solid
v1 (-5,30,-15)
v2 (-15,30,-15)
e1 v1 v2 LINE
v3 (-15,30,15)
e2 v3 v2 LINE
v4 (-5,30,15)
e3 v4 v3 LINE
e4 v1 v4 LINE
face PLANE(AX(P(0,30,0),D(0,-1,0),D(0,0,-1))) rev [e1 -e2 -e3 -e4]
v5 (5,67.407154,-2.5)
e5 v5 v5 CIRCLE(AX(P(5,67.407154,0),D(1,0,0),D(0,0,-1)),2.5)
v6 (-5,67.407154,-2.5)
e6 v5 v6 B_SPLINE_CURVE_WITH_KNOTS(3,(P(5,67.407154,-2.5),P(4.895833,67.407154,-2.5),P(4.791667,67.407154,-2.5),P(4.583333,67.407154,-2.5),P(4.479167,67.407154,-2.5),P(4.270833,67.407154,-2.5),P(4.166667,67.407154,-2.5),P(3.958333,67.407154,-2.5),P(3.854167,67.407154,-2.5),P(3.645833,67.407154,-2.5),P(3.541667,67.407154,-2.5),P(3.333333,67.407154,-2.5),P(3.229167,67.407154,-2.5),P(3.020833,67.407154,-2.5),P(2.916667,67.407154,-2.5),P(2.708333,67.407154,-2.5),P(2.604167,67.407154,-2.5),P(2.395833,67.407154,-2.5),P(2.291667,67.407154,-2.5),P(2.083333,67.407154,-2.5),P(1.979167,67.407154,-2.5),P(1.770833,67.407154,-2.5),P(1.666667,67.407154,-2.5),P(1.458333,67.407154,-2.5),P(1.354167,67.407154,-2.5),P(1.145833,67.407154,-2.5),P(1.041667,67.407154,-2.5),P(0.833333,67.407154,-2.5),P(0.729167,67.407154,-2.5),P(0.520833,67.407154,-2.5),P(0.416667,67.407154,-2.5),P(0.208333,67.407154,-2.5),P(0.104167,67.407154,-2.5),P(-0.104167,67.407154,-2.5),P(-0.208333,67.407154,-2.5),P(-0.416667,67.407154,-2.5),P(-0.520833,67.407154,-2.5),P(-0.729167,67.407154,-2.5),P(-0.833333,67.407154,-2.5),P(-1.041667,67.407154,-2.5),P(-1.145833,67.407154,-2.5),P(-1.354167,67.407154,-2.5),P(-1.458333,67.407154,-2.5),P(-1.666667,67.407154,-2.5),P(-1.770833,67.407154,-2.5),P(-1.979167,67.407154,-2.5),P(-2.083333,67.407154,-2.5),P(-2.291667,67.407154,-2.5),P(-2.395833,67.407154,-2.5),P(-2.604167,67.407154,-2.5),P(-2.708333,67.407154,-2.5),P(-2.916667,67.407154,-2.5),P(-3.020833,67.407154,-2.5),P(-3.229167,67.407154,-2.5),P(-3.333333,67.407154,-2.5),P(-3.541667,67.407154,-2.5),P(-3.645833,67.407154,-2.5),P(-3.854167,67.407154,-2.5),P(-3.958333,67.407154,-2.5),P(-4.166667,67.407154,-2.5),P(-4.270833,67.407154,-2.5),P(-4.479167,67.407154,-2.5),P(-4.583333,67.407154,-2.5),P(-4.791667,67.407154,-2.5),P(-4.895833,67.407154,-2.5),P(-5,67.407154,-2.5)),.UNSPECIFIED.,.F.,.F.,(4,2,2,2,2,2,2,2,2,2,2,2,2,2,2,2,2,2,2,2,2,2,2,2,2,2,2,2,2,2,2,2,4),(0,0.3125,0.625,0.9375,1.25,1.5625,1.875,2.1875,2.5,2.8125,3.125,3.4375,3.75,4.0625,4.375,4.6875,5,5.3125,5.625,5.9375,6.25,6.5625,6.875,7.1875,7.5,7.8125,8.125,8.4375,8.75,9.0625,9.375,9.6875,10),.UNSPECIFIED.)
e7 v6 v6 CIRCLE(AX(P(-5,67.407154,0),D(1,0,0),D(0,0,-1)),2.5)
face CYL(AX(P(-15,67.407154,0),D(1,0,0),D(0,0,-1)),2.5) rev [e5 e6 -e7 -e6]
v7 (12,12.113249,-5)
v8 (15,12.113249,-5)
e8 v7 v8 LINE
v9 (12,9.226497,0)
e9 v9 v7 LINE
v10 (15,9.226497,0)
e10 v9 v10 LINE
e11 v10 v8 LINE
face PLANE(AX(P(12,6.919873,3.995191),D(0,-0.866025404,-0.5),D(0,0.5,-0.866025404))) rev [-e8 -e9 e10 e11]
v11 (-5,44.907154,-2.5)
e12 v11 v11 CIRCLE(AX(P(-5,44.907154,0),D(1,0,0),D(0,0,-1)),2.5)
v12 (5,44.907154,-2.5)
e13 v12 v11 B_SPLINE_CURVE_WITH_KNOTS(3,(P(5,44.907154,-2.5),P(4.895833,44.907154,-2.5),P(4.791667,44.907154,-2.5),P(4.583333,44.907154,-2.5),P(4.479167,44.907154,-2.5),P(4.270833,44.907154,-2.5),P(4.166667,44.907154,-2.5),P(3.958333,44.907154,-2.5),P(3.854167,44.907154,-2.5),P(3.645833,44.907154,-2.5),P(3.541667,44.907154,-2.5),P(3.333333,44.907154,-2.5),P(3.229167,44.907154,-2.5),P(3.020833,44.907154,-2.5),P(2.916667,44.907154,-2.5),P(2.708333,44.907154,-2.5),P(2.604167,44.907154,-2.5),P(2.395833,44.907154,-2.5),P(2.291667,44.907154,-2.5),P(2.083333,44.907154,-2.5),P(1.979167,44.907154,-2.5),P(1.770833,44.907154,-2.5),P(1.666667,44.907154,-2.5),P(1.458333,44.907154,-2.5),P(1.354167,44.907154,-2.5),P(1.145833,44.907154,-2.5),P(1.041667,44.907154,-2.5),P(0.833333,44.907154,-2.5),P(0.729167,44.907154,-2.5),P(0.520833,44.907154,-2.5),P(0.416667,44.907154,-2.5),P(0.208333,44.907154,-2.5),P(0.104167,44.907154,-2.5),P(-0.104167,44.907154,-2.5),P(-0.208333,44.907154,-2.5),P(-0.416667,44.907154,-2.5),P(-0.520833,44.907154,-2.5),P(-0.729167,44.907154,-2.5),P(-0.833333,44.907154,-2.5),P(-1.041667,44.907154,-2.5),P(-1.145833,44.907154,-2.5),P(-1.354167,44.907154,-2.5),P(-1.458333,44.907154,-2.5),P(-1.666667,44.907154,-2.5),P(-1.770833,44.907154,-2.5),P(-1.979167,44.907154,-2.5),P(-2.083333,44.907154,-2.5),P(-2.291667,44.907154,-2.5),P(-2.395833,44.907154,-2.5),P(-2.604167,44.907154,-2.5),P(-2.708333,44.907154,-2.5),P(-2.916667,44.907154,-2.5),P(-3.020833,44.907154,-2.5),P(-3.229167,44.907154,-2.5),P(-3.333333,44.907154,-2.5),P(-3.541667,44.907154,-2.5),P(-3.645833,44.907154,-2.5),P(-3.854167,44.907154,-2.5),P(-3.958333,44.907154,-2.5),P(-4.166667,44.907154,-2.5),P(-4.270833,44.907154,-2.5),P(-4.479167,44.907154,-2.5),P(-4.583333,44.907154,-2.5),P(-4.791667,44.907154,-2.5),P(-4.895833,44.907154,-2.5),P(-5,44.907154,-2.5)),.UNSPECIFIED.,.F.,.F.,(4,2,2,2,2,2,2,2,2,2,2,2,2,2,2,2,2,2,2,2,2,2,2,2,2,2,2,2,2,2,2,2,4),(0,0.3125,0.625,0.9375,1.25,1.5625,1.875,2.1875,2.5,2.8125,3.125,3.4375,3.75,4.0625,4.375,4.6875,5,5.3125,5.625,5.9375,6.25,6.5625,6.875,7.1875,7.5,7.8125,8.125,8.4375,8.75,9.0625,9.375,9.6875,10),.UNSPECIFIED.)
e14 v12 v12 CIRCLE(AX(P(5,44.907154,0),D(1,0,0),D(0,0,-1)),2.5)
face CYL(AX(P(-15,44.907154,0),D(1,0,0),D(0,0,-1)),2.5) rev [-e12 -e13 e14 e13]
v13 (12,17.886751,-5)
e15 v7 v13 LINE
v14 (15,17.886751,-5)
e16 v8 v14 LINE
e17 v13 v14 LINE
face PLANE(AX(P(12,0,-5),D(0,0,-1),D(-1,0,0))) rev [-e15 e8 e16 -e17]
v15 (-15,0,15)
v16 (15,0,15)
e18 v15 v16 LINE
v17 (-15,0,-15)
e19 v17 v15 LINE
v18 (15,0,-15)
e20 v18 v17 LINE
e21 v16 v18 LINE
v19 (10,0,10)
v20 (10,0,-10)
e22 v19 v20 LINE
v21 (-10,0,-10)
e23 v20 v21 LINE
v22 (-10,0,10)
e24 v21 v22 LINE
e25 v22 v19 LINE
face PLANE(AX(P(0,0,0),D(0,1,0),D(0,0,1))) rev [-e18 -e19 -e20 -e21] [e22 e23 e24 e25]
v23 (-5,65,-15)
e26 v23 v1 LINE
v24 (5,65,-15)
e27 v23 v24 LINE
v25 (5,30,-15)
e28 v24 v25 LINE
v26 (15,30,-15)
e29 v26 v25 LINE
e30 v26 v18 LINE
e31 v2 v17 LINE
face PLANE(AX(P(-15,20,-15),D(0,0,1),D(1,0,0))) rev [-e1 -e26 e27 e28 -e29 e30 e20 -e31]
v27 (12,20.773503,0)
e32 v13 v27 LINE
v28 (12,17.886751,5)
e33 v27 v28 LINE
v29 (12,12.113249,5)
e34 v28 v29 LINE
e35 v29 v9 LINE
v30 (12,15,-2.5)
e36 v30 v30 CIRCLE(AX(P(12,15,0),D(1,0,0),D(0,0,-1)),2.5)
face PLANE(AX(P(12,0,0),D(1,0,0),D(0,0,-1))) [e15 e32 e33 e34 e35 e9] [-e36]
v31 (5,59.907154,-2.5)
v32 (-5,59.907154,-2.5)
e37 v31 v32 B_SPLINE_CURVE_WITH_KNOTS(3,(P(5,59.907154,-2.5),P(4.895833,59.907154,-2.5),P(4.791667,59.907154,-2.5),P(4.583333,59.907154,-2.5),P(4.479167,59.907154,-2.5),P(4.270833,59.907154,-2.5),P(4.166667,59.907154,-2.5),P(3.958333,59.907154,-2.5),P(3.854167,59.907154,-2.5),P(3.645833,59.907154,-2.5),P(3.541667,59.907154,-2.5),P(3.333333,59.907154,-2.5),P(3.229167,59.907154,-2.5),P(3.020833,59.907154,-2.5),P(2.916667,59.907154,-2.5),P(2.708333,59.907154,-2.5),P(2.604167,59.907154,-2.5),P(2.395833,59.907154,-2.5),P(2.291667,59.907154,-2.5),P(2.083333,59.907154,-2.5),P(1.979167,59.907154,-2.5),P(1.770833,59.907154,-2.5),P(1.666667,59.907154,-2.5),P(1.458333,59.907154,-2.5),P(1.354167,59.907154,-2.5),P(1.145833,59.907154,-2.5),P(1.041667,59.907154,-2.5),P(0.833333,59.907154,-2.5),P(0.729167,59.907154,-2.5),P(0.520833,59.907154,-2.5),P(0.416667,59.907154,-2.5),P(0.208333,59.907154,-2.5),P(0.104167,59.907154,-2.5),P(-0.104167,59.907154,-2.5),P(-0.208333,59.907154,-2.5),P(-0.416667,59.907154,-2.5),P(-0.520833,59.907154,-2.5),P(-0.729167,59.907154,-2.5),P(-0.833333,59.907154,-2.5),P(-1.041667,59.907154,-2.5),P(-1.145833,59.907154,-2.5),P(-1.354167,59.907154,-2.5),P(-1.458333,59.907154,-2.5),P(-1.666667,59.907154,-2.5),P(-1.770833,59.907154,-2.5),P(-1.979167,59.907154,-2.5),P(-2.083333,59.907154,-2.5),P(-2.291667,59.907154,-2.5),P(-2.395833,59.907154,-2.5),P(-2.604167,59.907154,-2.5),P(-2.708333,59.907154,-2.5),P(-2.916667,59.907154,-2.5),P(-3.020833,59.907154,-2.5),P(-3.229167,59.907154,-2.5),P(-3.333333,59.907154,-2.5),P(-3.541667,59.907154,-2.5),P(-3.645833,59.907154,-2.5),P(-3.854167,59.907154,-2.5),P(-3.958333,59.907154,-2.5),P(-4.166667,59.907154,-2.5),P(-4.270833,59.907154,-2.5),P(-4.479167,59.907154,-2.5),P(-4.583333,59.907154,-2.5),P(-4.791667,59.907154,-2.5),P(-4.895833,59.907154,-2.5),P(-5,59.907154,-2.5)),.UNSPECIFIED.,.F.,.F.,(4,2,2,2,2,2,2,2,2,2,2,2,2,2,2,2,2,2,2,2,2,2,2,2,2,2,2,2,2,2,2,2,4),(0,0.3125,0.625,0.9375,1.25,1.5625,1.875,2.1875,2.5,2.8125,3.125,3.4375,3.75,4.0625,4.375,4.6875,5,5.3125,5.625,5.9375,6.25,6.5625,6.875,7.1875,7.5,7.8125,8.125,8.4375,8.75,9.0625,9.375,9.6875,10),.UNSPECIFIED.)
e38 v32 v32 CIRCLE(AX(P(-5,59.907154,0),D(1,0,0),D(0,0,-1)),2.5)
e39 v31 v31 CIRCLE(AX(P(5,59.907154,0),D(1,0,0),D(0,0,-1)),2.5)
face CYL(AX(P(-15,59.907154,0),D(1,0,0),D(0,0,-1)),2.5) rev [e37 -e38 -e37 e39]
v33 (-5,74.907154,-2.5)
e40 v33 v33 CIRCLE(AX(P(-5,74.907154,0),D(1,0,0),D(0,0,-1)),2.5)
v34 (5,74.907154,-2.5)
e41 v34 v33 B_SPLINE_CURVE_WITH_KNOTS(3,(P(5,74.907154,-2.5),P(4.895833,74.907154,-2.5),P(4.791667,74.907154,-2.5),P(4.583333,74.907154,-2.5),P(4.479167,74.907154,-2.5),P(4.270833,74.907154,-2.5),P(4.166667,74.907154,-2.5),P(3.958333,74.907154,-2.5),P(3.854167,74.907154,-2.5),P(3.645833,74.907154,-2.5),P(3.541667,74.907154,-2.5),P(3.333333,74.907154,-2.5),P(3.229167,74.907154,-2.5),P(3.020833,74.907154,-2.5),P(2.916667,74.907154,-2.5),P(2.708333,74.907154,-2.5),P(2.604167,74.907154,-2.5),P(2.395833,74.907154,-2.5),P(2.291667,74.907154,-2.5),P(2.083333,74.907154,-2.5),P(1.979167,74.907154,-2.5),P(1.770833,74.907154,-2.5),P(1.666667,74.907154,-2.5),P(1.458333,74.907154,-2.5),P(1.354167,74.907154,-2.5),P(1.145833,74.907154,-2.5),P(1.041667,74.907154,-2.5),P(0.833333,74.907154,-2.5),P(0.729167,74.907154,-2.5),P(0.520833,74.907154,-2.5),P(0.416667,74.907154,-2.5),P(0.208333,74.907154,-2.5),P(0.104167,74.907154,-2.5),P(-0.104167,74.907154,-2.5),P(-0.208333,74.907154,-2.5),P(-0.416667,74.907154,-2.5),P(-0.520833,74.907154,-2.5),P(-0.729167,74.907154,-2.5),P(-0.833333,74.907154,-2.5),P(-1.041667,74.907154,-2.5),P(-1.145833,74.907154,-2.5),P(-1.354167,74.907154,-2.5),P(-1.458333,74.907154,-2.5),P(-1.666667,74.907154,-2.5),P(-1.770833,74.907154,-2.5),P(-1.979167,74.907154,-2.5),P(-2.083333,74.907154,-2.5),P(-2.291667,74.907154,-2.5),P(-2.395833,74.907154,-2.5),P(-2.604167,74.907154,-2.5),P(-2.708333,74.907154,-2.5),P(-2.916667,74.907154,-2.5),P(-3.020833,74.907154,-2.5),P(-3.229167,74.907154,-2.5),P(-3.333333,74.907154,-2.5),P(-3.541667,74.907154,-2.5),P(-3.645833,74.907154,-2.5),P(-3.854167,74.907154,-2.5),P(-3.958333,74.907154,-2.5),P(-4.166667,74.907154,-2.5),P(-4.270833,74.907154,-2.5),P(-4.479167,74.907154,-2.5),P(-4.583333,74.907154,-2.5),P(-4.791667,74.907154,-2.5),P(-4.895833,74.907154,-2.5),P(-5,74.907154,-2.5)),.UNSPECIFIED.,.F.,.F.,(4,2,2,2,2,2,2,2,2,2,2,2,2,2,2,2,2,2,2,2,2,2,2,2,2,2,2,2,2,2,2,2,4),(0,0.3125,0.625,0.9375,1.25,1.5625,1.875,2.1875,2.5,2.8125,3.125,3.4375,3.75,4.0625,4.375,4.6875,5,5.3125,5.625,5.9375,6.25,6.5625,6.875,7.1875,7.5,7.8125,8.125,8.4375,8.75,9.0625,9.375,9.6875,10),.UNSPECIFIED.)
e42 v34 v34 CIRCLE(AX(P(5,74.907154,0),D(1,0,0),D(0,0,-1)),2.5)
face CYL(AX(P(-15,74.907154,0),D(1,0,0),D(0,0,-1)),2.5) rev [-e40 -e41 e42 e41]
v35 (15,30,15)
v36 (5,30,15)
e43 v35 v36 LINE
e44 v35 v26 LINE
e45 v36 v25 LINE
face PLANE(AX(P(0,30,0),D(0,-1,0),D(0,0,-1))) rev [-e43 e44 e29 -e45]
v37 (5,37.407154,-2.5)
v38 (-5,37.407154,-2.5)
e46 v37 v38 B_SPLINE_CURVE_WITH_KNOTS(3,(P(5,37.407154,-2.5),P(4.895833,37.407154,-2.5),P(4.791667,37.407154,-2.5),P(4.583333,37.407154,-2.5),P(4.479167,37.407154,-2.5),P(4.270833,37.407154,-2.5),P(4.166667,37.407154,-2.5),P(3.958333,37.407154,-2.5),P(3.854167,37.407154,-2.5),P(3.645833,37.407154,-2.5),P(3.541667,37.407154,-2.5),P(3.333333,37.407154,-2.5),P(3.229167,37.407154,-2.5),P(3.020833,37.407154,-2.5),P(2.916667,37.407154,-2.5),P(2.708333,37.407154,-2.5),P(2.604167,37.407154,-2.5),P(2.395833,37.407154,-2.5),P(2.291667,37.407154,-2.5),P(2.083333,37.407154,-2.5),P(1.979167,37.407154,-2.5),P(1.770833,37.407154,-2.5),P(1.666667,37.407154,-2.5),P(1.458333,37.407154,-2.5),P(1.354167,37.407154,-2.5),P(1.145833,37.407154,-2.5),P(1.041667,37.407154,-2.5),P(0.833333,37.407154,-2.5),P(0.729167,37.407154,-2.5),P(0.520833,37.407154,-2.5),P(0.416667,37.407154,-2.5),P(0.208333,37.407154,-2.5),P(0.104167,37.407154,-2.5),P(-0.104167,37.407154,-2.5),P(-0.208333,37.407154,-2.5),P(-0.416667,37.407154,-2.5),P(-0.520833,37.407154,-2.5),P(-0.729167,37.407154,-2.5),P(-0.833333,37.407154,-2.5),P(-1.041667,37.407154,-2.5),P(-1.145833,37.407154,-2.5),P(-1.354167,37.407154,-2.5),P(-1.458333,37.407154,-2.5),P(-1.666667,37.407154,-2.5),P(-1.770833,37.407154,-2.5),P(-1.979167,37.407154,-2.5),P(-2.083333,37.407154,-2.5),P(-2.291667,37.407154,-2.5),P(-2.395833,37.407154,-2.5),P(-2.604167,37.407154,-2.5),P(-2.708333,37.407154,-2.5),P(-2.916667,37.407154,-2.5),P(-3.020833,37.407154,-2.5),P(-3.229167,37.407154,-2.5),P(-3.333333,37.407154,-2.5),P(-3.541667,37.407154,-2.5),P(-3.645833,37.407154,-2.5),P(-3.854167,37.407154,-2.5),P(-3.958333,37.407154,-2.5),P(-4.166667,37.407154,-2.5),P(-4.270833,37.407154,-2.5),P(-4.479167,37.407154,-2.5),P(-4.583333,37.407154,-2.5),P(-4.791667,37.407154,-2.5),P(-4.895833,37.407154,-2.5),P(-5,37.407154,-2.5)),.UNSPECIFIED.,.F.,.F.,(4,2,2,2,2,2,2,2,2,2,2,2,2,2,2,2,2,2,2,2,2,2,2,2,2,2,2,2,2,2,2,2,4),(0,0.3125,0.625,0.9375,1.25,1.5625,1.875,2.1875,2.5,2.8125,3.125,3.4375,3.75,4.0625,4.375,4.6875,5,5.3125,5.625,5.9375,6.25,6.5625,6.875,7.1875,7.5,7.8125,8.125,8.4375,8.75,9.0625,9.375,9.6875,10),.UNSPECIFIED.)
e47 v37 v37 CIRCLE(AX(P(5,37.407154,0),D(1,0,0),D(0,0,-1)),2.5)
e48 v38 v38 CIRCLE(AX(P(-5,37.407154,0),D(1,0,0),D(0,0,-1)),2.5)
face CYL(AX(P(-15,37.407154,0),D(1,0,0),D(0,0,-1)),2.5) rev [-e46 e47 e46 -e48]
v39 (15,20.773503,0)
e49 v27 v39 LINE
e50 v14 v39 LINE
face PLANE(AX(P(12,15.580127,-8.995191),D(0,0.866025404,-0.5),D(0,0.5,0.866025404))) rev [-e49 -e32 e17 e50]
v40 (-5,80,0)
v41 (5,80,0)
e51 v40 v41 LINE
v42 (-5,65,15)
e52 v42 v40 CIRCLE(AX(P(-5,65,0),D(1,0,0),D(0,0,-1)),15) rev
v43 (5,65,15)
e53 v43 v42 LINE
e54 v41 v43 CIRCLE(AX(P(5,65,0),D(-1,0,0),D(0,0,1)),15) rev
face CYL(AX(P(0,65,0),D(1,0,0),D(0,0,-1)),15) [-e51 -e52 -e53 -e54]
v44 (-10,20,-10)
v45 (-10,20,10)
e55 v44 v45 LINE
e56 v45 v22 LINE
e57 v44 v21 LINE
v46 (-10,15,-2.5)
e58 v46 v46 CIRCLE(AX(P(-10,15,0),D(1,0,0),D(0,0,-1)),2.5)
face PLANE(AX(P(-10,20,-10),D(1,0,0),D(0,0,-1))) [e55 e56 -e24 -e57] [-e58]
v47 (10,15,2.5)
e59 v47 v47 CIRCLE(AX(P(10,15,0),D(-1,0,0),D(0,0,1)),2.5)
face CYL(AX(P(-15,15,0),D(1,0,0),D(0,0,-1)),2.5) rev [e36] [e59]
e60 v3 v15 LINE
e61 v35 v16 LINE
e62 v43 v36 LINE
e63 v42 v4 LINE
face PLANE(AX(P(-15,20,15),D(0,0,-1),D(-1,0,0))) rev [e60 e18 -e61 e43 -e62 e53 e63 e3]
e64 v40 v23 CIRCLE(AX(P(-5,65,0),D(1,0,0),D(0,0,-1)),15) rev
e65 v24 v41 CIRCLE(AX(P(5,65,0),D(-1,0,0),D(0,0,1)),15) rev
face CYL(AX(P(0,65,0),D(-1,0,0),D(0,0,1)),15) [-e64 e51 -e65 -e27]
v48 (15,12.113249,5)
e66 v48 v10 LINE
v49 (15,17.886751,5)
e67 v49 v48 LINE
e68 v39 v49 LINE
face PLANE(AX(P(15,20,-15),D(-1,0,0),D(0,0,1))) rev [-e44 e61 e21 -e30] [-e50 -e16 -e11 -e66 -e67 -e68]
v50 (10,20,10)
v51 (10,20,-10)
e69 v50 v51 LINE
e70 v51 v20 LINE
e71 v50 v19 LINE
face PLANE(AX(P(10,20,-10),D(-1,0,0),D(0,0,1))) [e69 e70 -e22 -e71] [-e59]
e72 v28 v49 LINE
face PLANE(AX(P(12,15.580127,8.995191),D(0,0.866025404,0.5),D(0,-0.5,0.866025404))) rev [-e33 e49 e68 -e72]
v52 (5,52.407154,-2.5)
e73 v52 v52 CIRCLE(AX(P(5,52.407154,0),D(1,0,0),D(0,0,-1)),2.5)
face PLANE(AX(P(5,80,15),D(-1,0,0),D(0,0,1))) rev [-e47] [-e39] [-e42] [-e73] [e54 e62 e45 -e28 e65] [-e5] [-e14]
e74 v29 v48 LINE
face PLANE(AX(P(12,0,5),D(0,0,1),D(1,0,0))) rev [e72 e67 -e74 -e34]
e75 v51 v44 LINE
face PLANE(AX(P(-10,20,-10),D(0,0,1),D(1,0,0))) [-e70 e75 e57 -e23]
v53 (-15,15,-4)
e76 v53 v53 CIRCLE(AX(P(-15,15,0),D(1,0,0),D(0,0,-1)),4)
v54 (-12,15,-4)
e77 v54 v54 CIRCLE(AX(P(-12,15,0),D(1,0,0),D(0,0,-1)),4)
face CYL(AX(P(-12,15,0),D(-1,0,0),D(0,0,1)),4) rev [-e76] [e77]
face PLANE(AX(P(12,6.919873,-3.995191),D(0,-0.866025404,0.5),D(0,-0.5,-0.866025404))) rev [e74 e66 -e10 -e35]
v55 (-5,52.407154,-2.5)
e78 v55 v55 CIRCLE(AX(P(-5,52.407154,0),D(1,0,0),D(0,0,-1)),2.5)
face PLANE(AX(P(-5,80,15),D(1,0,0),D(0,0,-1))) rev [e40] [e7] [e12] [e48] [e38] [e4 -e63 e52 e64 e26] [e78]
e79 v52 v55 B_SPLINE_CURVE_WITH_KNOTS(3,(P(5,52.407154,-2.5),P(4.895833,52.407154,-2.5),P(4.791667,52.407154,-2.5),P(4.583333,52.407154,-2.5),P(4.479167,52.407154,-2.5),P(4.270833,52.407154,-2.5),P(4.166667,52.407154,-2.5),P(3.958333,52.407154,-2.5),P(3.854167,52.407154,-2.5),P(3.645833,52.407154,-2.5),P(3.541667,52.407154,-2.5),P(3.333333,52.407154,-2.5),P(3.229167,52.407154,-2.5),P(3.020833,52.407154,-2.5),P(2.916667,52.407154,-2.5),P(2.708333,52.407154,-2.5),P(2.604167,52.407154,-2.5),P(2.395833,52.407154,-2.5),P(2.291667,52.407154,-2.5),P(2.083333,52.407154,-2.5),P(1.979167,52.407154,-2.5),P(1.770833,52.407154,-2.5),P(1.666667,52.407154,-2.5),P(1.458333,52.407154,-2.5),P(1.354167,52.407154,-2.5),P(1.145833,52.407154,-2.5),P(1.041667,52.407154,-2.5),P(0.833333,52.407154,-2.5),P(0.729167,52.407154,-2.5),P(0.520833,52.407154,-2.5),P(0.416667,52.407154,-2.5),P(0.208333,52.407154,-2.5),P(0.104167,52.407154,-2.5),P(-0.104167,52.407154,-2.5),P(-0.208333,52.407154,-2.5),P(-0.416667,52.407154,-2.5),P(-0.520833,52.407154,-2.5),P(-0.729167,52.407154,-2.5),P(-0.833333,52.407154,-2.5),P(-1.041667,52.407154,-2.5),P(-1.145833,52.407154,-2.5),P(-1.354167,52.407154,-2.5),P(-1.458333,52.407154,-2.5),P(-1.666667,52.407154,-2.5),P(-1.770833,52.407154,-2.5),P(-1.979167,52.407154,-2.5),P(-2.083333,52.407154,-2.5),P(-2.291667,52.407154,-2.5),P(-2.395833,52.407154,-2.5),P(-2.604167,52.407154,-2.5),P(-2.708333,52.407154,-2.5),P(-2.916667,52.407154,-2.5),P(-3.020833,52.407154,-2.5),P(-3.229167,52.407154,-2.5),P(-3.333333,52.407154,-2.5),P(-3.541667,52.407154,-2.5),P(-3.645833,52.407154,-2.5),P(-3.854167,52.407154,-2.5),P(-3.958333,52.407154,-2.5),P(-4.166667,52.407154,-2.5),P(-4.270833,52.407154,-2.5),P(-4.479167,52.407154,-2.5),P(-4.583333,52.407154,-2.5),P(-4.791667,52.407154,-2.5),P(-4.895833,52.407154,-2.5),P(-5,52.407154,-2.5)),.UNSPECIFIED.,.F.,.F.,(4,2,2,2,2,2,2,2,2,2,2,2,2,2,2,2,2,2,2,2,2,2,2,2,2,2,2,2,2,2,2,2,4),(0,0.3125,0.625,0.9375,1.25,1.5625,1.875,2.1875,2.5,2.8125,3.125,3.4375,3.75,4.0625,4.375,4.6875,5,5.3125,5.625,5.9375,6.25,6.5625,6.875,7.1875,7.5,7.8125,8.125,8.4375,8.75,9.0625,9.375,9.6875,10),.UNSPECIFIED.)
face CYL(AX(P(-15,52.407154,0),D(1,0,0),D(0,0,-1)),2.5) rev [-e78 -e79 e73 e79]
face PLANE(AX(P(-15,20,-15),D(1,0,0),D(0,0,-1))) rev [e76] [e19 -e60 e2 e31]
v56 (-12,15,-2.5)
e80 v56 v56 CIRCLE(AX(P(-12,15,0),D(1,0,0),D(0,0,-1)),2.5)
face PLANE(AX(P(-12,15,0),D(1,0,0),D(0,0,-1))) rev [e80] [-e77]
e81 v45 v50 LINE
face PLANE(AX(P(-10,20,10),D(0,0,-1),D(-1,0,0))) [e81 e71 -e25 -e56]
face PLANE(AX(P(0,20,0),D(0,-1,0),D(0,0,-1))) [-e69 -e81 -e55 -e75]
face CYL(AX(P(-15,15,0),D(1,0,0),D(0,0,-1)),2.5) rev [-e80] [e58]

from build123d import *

# Parameters (mm, degrees)
SKETCH1_W           = 30
SKETCH1_H           = 30
SKETCH1_W_2         = 20
SKETCH1_H_2         = 20
BOSS_EXTRUDE1_DEPTH = 20
BOSS_EXTRUDE2_START = 20
SKETCH1_2_W         = 30
SKETCH1_2_H         = 30
SKETCH1_2_W_2       = 20
SKETCH1_2_H_2       = 20
BOSS_EXTRUDE2_DEPTH = 10
SKETCH3_R           = 2.5
CUT_EXTRUDE1_DEPTH  = 46
SKETCH3_3_R         = 4
SKETCH3_3_R_2       = 2.5
CUT_EXTRUDE2_DEPTH  = 3
CUT_EXTRUDE3_START  = -27
SKETCH3_4_R         = 4
SKETCH3_4_R_2       = 2.5
CUT_EXTRUDE3_DEPTH  = 3
SKETCH4_W           = 10
SKETCH4_H           = 30
BOSS_EXTRUDE3_DEPTH = 50
SKETCH5_R           = 2.5
CUT_EXTRUDE4_DEPTH  = 84.815273071
LPATTERN1_COUNT     = 6
LPATTERN1_PITCH     = 7.5
FILLET1_R           = 15


with BuildPart() as part:
    # Sketch1 → Boss-Extrude1 (new body)
    with BuildSketch(Plane(origin=(0, 0, 0), x_dir=(1, 0, 0), z_dir=(0, 1, 0))):
        Rectangle(SKETCH1_W, SKETCH1_H)
        Rectangle(SKETCH1_W_2, SKETCH1_H_2, mode=Mode.SUBTRACT)
    extrude(amount=BOSS_EXTRUDE1_DEPTH)

    # Sketch1<2> → Boss-Extrude2 (add)
    # profile 1 of 2: a face of its own
    with BuildSketch(Plane(origin=(0, 0, 0), x_dir=(1, 0, 0), z_dir=(0, 1, 0)).offset(BOSS_EXTRUDE2_START)):
        Rectangle(SKETCH1_2_W, SKETCH1_2_H)
        Rectangle(SKETCH1_2_W_2, SKETCH1_2_H_2, mode=Mode.SUBTRACT)
    # profile 2 of 2: a face of its own
    with BuildSketch(Plane(origin=(0, 0, 0), x_dir=(1, 0, 0), z_dir=(0, 1, 0)).offset(BOSS_EXTRUDE2_START)):
        Rectangle(SKETCH1_2_W_2, SKETCH1_2_H_2)
    extrude(amount=BOSS_EXTRUDE2_DEPTH)

    # Sketch3 → Cut-Extrude1 (cut, through all)
    with BuildSketch(Plane(origin=(15, 0, 0), x_dir=(0, 0, -1), z_dir=(1, 0, 0))):
        with Locations((0, 15)):
            Circle(SKETCH3_R)
    extrude(amount=-CUT_EXTRUDE1_DEPTH, mode=Mode.SUBTRACT)

    # Sketch3<3> → Cut-Extrude2 (cut)
    # profile 1 of 2: a face of its own
    with BuildSketch(Plane(origin=(15, 0, 0), x_dir=(0, 0, -1), z_dir=(1, 0, 0))):
        Polygon((-5, 17.886751346), (-5, 12.113248654), (0, 9.226497308), (5, 12.113248654), (5, 17.886751346), (0, 20.773502692), align=None)
        with Locations((0, 15)):
            Circle(SKETCH3_3_R, mode=Mode.SUBTRACT)
    # profile 2 of 2: a face of its own
    with BuildSketch(Plane(origin=(15, 0, 0), x_dir=(0, 0, -1), z_dir=(1, 0, 0))):
        with Locations((0, 15)):
            Circle(SKETCH3_3_R)
        with Locations((0, 15)):
            Circle(SKETCH3_3_R_2, mode=Mode.SUBTRACT)
    extrude(amount=-CUT_EXTRUDE2_DEPTH, mode=Mode.SUBTRACT)

    # Sketch3<4> → Cut-Extrude3 (cut)
    with BuildSketch(Plane(origin=(15, 0, 0), x_dir=(0, 0, -1), z_dir=(1, 0, 0)).offset(CUT_EXTRUDE3_START)):
        with Locations((0, 15)):
            Circle(SKETCH3_4_R)
        with Locations((0, 15)):
            Circle(SKETCH3_4_R_2, mode=Mode.SUBTRACT)
    extrude(amount=-CUT_EXTRUDE3_DEPTH, mode=Mode.SUBTRACT)

    # Sketch4 → Boss-Extrude3 (add)
    with BuildSketch(Plane(origin=(0, 30, 0), x_dir=(1, 0, 0), z_dir=(0, 1, 0))):
        Rectangle(SKETCH4_W, SKETCH4_H)
    extrude(amount=BOSS_EXTRUDE3_DEPTH)

    # Sketch5 → Cut-Extrude4 (cut, through all)
    with BuildSketch(Plane(origin=(5, 0, 0), x_dir=(0, 0, -1), z_dir=(1, 0, 0))):
        with Locations((0, 37.407153601)):
            Circle(SKETCH5_R)
    cut_extrude4 = extrude(amount=-CUT_EXTRUDE4_DEPTH, mode=Mode.SUBTRACT)

    # LPattern1: Cut-Extrude4 ×6
    with Locations(*[(0, i * LPATTERN1_PITCH, 0) for i in range(1, LPATTERN1_COUNT)]):
        add(cut_extrude4, mode=Mode.SUBTRACT)

    # Fillet1
    fillet1_edges = [part.edges().sort_by_distance(p)[0] for p in [
        (0, 80, -15),
        (0, 80, 15),
    ]]
    fillet(fillet1_edges, radius=FILLET1_R - 0.0001)  # a hair under: the kernel refuses the full size


solid = part.part
